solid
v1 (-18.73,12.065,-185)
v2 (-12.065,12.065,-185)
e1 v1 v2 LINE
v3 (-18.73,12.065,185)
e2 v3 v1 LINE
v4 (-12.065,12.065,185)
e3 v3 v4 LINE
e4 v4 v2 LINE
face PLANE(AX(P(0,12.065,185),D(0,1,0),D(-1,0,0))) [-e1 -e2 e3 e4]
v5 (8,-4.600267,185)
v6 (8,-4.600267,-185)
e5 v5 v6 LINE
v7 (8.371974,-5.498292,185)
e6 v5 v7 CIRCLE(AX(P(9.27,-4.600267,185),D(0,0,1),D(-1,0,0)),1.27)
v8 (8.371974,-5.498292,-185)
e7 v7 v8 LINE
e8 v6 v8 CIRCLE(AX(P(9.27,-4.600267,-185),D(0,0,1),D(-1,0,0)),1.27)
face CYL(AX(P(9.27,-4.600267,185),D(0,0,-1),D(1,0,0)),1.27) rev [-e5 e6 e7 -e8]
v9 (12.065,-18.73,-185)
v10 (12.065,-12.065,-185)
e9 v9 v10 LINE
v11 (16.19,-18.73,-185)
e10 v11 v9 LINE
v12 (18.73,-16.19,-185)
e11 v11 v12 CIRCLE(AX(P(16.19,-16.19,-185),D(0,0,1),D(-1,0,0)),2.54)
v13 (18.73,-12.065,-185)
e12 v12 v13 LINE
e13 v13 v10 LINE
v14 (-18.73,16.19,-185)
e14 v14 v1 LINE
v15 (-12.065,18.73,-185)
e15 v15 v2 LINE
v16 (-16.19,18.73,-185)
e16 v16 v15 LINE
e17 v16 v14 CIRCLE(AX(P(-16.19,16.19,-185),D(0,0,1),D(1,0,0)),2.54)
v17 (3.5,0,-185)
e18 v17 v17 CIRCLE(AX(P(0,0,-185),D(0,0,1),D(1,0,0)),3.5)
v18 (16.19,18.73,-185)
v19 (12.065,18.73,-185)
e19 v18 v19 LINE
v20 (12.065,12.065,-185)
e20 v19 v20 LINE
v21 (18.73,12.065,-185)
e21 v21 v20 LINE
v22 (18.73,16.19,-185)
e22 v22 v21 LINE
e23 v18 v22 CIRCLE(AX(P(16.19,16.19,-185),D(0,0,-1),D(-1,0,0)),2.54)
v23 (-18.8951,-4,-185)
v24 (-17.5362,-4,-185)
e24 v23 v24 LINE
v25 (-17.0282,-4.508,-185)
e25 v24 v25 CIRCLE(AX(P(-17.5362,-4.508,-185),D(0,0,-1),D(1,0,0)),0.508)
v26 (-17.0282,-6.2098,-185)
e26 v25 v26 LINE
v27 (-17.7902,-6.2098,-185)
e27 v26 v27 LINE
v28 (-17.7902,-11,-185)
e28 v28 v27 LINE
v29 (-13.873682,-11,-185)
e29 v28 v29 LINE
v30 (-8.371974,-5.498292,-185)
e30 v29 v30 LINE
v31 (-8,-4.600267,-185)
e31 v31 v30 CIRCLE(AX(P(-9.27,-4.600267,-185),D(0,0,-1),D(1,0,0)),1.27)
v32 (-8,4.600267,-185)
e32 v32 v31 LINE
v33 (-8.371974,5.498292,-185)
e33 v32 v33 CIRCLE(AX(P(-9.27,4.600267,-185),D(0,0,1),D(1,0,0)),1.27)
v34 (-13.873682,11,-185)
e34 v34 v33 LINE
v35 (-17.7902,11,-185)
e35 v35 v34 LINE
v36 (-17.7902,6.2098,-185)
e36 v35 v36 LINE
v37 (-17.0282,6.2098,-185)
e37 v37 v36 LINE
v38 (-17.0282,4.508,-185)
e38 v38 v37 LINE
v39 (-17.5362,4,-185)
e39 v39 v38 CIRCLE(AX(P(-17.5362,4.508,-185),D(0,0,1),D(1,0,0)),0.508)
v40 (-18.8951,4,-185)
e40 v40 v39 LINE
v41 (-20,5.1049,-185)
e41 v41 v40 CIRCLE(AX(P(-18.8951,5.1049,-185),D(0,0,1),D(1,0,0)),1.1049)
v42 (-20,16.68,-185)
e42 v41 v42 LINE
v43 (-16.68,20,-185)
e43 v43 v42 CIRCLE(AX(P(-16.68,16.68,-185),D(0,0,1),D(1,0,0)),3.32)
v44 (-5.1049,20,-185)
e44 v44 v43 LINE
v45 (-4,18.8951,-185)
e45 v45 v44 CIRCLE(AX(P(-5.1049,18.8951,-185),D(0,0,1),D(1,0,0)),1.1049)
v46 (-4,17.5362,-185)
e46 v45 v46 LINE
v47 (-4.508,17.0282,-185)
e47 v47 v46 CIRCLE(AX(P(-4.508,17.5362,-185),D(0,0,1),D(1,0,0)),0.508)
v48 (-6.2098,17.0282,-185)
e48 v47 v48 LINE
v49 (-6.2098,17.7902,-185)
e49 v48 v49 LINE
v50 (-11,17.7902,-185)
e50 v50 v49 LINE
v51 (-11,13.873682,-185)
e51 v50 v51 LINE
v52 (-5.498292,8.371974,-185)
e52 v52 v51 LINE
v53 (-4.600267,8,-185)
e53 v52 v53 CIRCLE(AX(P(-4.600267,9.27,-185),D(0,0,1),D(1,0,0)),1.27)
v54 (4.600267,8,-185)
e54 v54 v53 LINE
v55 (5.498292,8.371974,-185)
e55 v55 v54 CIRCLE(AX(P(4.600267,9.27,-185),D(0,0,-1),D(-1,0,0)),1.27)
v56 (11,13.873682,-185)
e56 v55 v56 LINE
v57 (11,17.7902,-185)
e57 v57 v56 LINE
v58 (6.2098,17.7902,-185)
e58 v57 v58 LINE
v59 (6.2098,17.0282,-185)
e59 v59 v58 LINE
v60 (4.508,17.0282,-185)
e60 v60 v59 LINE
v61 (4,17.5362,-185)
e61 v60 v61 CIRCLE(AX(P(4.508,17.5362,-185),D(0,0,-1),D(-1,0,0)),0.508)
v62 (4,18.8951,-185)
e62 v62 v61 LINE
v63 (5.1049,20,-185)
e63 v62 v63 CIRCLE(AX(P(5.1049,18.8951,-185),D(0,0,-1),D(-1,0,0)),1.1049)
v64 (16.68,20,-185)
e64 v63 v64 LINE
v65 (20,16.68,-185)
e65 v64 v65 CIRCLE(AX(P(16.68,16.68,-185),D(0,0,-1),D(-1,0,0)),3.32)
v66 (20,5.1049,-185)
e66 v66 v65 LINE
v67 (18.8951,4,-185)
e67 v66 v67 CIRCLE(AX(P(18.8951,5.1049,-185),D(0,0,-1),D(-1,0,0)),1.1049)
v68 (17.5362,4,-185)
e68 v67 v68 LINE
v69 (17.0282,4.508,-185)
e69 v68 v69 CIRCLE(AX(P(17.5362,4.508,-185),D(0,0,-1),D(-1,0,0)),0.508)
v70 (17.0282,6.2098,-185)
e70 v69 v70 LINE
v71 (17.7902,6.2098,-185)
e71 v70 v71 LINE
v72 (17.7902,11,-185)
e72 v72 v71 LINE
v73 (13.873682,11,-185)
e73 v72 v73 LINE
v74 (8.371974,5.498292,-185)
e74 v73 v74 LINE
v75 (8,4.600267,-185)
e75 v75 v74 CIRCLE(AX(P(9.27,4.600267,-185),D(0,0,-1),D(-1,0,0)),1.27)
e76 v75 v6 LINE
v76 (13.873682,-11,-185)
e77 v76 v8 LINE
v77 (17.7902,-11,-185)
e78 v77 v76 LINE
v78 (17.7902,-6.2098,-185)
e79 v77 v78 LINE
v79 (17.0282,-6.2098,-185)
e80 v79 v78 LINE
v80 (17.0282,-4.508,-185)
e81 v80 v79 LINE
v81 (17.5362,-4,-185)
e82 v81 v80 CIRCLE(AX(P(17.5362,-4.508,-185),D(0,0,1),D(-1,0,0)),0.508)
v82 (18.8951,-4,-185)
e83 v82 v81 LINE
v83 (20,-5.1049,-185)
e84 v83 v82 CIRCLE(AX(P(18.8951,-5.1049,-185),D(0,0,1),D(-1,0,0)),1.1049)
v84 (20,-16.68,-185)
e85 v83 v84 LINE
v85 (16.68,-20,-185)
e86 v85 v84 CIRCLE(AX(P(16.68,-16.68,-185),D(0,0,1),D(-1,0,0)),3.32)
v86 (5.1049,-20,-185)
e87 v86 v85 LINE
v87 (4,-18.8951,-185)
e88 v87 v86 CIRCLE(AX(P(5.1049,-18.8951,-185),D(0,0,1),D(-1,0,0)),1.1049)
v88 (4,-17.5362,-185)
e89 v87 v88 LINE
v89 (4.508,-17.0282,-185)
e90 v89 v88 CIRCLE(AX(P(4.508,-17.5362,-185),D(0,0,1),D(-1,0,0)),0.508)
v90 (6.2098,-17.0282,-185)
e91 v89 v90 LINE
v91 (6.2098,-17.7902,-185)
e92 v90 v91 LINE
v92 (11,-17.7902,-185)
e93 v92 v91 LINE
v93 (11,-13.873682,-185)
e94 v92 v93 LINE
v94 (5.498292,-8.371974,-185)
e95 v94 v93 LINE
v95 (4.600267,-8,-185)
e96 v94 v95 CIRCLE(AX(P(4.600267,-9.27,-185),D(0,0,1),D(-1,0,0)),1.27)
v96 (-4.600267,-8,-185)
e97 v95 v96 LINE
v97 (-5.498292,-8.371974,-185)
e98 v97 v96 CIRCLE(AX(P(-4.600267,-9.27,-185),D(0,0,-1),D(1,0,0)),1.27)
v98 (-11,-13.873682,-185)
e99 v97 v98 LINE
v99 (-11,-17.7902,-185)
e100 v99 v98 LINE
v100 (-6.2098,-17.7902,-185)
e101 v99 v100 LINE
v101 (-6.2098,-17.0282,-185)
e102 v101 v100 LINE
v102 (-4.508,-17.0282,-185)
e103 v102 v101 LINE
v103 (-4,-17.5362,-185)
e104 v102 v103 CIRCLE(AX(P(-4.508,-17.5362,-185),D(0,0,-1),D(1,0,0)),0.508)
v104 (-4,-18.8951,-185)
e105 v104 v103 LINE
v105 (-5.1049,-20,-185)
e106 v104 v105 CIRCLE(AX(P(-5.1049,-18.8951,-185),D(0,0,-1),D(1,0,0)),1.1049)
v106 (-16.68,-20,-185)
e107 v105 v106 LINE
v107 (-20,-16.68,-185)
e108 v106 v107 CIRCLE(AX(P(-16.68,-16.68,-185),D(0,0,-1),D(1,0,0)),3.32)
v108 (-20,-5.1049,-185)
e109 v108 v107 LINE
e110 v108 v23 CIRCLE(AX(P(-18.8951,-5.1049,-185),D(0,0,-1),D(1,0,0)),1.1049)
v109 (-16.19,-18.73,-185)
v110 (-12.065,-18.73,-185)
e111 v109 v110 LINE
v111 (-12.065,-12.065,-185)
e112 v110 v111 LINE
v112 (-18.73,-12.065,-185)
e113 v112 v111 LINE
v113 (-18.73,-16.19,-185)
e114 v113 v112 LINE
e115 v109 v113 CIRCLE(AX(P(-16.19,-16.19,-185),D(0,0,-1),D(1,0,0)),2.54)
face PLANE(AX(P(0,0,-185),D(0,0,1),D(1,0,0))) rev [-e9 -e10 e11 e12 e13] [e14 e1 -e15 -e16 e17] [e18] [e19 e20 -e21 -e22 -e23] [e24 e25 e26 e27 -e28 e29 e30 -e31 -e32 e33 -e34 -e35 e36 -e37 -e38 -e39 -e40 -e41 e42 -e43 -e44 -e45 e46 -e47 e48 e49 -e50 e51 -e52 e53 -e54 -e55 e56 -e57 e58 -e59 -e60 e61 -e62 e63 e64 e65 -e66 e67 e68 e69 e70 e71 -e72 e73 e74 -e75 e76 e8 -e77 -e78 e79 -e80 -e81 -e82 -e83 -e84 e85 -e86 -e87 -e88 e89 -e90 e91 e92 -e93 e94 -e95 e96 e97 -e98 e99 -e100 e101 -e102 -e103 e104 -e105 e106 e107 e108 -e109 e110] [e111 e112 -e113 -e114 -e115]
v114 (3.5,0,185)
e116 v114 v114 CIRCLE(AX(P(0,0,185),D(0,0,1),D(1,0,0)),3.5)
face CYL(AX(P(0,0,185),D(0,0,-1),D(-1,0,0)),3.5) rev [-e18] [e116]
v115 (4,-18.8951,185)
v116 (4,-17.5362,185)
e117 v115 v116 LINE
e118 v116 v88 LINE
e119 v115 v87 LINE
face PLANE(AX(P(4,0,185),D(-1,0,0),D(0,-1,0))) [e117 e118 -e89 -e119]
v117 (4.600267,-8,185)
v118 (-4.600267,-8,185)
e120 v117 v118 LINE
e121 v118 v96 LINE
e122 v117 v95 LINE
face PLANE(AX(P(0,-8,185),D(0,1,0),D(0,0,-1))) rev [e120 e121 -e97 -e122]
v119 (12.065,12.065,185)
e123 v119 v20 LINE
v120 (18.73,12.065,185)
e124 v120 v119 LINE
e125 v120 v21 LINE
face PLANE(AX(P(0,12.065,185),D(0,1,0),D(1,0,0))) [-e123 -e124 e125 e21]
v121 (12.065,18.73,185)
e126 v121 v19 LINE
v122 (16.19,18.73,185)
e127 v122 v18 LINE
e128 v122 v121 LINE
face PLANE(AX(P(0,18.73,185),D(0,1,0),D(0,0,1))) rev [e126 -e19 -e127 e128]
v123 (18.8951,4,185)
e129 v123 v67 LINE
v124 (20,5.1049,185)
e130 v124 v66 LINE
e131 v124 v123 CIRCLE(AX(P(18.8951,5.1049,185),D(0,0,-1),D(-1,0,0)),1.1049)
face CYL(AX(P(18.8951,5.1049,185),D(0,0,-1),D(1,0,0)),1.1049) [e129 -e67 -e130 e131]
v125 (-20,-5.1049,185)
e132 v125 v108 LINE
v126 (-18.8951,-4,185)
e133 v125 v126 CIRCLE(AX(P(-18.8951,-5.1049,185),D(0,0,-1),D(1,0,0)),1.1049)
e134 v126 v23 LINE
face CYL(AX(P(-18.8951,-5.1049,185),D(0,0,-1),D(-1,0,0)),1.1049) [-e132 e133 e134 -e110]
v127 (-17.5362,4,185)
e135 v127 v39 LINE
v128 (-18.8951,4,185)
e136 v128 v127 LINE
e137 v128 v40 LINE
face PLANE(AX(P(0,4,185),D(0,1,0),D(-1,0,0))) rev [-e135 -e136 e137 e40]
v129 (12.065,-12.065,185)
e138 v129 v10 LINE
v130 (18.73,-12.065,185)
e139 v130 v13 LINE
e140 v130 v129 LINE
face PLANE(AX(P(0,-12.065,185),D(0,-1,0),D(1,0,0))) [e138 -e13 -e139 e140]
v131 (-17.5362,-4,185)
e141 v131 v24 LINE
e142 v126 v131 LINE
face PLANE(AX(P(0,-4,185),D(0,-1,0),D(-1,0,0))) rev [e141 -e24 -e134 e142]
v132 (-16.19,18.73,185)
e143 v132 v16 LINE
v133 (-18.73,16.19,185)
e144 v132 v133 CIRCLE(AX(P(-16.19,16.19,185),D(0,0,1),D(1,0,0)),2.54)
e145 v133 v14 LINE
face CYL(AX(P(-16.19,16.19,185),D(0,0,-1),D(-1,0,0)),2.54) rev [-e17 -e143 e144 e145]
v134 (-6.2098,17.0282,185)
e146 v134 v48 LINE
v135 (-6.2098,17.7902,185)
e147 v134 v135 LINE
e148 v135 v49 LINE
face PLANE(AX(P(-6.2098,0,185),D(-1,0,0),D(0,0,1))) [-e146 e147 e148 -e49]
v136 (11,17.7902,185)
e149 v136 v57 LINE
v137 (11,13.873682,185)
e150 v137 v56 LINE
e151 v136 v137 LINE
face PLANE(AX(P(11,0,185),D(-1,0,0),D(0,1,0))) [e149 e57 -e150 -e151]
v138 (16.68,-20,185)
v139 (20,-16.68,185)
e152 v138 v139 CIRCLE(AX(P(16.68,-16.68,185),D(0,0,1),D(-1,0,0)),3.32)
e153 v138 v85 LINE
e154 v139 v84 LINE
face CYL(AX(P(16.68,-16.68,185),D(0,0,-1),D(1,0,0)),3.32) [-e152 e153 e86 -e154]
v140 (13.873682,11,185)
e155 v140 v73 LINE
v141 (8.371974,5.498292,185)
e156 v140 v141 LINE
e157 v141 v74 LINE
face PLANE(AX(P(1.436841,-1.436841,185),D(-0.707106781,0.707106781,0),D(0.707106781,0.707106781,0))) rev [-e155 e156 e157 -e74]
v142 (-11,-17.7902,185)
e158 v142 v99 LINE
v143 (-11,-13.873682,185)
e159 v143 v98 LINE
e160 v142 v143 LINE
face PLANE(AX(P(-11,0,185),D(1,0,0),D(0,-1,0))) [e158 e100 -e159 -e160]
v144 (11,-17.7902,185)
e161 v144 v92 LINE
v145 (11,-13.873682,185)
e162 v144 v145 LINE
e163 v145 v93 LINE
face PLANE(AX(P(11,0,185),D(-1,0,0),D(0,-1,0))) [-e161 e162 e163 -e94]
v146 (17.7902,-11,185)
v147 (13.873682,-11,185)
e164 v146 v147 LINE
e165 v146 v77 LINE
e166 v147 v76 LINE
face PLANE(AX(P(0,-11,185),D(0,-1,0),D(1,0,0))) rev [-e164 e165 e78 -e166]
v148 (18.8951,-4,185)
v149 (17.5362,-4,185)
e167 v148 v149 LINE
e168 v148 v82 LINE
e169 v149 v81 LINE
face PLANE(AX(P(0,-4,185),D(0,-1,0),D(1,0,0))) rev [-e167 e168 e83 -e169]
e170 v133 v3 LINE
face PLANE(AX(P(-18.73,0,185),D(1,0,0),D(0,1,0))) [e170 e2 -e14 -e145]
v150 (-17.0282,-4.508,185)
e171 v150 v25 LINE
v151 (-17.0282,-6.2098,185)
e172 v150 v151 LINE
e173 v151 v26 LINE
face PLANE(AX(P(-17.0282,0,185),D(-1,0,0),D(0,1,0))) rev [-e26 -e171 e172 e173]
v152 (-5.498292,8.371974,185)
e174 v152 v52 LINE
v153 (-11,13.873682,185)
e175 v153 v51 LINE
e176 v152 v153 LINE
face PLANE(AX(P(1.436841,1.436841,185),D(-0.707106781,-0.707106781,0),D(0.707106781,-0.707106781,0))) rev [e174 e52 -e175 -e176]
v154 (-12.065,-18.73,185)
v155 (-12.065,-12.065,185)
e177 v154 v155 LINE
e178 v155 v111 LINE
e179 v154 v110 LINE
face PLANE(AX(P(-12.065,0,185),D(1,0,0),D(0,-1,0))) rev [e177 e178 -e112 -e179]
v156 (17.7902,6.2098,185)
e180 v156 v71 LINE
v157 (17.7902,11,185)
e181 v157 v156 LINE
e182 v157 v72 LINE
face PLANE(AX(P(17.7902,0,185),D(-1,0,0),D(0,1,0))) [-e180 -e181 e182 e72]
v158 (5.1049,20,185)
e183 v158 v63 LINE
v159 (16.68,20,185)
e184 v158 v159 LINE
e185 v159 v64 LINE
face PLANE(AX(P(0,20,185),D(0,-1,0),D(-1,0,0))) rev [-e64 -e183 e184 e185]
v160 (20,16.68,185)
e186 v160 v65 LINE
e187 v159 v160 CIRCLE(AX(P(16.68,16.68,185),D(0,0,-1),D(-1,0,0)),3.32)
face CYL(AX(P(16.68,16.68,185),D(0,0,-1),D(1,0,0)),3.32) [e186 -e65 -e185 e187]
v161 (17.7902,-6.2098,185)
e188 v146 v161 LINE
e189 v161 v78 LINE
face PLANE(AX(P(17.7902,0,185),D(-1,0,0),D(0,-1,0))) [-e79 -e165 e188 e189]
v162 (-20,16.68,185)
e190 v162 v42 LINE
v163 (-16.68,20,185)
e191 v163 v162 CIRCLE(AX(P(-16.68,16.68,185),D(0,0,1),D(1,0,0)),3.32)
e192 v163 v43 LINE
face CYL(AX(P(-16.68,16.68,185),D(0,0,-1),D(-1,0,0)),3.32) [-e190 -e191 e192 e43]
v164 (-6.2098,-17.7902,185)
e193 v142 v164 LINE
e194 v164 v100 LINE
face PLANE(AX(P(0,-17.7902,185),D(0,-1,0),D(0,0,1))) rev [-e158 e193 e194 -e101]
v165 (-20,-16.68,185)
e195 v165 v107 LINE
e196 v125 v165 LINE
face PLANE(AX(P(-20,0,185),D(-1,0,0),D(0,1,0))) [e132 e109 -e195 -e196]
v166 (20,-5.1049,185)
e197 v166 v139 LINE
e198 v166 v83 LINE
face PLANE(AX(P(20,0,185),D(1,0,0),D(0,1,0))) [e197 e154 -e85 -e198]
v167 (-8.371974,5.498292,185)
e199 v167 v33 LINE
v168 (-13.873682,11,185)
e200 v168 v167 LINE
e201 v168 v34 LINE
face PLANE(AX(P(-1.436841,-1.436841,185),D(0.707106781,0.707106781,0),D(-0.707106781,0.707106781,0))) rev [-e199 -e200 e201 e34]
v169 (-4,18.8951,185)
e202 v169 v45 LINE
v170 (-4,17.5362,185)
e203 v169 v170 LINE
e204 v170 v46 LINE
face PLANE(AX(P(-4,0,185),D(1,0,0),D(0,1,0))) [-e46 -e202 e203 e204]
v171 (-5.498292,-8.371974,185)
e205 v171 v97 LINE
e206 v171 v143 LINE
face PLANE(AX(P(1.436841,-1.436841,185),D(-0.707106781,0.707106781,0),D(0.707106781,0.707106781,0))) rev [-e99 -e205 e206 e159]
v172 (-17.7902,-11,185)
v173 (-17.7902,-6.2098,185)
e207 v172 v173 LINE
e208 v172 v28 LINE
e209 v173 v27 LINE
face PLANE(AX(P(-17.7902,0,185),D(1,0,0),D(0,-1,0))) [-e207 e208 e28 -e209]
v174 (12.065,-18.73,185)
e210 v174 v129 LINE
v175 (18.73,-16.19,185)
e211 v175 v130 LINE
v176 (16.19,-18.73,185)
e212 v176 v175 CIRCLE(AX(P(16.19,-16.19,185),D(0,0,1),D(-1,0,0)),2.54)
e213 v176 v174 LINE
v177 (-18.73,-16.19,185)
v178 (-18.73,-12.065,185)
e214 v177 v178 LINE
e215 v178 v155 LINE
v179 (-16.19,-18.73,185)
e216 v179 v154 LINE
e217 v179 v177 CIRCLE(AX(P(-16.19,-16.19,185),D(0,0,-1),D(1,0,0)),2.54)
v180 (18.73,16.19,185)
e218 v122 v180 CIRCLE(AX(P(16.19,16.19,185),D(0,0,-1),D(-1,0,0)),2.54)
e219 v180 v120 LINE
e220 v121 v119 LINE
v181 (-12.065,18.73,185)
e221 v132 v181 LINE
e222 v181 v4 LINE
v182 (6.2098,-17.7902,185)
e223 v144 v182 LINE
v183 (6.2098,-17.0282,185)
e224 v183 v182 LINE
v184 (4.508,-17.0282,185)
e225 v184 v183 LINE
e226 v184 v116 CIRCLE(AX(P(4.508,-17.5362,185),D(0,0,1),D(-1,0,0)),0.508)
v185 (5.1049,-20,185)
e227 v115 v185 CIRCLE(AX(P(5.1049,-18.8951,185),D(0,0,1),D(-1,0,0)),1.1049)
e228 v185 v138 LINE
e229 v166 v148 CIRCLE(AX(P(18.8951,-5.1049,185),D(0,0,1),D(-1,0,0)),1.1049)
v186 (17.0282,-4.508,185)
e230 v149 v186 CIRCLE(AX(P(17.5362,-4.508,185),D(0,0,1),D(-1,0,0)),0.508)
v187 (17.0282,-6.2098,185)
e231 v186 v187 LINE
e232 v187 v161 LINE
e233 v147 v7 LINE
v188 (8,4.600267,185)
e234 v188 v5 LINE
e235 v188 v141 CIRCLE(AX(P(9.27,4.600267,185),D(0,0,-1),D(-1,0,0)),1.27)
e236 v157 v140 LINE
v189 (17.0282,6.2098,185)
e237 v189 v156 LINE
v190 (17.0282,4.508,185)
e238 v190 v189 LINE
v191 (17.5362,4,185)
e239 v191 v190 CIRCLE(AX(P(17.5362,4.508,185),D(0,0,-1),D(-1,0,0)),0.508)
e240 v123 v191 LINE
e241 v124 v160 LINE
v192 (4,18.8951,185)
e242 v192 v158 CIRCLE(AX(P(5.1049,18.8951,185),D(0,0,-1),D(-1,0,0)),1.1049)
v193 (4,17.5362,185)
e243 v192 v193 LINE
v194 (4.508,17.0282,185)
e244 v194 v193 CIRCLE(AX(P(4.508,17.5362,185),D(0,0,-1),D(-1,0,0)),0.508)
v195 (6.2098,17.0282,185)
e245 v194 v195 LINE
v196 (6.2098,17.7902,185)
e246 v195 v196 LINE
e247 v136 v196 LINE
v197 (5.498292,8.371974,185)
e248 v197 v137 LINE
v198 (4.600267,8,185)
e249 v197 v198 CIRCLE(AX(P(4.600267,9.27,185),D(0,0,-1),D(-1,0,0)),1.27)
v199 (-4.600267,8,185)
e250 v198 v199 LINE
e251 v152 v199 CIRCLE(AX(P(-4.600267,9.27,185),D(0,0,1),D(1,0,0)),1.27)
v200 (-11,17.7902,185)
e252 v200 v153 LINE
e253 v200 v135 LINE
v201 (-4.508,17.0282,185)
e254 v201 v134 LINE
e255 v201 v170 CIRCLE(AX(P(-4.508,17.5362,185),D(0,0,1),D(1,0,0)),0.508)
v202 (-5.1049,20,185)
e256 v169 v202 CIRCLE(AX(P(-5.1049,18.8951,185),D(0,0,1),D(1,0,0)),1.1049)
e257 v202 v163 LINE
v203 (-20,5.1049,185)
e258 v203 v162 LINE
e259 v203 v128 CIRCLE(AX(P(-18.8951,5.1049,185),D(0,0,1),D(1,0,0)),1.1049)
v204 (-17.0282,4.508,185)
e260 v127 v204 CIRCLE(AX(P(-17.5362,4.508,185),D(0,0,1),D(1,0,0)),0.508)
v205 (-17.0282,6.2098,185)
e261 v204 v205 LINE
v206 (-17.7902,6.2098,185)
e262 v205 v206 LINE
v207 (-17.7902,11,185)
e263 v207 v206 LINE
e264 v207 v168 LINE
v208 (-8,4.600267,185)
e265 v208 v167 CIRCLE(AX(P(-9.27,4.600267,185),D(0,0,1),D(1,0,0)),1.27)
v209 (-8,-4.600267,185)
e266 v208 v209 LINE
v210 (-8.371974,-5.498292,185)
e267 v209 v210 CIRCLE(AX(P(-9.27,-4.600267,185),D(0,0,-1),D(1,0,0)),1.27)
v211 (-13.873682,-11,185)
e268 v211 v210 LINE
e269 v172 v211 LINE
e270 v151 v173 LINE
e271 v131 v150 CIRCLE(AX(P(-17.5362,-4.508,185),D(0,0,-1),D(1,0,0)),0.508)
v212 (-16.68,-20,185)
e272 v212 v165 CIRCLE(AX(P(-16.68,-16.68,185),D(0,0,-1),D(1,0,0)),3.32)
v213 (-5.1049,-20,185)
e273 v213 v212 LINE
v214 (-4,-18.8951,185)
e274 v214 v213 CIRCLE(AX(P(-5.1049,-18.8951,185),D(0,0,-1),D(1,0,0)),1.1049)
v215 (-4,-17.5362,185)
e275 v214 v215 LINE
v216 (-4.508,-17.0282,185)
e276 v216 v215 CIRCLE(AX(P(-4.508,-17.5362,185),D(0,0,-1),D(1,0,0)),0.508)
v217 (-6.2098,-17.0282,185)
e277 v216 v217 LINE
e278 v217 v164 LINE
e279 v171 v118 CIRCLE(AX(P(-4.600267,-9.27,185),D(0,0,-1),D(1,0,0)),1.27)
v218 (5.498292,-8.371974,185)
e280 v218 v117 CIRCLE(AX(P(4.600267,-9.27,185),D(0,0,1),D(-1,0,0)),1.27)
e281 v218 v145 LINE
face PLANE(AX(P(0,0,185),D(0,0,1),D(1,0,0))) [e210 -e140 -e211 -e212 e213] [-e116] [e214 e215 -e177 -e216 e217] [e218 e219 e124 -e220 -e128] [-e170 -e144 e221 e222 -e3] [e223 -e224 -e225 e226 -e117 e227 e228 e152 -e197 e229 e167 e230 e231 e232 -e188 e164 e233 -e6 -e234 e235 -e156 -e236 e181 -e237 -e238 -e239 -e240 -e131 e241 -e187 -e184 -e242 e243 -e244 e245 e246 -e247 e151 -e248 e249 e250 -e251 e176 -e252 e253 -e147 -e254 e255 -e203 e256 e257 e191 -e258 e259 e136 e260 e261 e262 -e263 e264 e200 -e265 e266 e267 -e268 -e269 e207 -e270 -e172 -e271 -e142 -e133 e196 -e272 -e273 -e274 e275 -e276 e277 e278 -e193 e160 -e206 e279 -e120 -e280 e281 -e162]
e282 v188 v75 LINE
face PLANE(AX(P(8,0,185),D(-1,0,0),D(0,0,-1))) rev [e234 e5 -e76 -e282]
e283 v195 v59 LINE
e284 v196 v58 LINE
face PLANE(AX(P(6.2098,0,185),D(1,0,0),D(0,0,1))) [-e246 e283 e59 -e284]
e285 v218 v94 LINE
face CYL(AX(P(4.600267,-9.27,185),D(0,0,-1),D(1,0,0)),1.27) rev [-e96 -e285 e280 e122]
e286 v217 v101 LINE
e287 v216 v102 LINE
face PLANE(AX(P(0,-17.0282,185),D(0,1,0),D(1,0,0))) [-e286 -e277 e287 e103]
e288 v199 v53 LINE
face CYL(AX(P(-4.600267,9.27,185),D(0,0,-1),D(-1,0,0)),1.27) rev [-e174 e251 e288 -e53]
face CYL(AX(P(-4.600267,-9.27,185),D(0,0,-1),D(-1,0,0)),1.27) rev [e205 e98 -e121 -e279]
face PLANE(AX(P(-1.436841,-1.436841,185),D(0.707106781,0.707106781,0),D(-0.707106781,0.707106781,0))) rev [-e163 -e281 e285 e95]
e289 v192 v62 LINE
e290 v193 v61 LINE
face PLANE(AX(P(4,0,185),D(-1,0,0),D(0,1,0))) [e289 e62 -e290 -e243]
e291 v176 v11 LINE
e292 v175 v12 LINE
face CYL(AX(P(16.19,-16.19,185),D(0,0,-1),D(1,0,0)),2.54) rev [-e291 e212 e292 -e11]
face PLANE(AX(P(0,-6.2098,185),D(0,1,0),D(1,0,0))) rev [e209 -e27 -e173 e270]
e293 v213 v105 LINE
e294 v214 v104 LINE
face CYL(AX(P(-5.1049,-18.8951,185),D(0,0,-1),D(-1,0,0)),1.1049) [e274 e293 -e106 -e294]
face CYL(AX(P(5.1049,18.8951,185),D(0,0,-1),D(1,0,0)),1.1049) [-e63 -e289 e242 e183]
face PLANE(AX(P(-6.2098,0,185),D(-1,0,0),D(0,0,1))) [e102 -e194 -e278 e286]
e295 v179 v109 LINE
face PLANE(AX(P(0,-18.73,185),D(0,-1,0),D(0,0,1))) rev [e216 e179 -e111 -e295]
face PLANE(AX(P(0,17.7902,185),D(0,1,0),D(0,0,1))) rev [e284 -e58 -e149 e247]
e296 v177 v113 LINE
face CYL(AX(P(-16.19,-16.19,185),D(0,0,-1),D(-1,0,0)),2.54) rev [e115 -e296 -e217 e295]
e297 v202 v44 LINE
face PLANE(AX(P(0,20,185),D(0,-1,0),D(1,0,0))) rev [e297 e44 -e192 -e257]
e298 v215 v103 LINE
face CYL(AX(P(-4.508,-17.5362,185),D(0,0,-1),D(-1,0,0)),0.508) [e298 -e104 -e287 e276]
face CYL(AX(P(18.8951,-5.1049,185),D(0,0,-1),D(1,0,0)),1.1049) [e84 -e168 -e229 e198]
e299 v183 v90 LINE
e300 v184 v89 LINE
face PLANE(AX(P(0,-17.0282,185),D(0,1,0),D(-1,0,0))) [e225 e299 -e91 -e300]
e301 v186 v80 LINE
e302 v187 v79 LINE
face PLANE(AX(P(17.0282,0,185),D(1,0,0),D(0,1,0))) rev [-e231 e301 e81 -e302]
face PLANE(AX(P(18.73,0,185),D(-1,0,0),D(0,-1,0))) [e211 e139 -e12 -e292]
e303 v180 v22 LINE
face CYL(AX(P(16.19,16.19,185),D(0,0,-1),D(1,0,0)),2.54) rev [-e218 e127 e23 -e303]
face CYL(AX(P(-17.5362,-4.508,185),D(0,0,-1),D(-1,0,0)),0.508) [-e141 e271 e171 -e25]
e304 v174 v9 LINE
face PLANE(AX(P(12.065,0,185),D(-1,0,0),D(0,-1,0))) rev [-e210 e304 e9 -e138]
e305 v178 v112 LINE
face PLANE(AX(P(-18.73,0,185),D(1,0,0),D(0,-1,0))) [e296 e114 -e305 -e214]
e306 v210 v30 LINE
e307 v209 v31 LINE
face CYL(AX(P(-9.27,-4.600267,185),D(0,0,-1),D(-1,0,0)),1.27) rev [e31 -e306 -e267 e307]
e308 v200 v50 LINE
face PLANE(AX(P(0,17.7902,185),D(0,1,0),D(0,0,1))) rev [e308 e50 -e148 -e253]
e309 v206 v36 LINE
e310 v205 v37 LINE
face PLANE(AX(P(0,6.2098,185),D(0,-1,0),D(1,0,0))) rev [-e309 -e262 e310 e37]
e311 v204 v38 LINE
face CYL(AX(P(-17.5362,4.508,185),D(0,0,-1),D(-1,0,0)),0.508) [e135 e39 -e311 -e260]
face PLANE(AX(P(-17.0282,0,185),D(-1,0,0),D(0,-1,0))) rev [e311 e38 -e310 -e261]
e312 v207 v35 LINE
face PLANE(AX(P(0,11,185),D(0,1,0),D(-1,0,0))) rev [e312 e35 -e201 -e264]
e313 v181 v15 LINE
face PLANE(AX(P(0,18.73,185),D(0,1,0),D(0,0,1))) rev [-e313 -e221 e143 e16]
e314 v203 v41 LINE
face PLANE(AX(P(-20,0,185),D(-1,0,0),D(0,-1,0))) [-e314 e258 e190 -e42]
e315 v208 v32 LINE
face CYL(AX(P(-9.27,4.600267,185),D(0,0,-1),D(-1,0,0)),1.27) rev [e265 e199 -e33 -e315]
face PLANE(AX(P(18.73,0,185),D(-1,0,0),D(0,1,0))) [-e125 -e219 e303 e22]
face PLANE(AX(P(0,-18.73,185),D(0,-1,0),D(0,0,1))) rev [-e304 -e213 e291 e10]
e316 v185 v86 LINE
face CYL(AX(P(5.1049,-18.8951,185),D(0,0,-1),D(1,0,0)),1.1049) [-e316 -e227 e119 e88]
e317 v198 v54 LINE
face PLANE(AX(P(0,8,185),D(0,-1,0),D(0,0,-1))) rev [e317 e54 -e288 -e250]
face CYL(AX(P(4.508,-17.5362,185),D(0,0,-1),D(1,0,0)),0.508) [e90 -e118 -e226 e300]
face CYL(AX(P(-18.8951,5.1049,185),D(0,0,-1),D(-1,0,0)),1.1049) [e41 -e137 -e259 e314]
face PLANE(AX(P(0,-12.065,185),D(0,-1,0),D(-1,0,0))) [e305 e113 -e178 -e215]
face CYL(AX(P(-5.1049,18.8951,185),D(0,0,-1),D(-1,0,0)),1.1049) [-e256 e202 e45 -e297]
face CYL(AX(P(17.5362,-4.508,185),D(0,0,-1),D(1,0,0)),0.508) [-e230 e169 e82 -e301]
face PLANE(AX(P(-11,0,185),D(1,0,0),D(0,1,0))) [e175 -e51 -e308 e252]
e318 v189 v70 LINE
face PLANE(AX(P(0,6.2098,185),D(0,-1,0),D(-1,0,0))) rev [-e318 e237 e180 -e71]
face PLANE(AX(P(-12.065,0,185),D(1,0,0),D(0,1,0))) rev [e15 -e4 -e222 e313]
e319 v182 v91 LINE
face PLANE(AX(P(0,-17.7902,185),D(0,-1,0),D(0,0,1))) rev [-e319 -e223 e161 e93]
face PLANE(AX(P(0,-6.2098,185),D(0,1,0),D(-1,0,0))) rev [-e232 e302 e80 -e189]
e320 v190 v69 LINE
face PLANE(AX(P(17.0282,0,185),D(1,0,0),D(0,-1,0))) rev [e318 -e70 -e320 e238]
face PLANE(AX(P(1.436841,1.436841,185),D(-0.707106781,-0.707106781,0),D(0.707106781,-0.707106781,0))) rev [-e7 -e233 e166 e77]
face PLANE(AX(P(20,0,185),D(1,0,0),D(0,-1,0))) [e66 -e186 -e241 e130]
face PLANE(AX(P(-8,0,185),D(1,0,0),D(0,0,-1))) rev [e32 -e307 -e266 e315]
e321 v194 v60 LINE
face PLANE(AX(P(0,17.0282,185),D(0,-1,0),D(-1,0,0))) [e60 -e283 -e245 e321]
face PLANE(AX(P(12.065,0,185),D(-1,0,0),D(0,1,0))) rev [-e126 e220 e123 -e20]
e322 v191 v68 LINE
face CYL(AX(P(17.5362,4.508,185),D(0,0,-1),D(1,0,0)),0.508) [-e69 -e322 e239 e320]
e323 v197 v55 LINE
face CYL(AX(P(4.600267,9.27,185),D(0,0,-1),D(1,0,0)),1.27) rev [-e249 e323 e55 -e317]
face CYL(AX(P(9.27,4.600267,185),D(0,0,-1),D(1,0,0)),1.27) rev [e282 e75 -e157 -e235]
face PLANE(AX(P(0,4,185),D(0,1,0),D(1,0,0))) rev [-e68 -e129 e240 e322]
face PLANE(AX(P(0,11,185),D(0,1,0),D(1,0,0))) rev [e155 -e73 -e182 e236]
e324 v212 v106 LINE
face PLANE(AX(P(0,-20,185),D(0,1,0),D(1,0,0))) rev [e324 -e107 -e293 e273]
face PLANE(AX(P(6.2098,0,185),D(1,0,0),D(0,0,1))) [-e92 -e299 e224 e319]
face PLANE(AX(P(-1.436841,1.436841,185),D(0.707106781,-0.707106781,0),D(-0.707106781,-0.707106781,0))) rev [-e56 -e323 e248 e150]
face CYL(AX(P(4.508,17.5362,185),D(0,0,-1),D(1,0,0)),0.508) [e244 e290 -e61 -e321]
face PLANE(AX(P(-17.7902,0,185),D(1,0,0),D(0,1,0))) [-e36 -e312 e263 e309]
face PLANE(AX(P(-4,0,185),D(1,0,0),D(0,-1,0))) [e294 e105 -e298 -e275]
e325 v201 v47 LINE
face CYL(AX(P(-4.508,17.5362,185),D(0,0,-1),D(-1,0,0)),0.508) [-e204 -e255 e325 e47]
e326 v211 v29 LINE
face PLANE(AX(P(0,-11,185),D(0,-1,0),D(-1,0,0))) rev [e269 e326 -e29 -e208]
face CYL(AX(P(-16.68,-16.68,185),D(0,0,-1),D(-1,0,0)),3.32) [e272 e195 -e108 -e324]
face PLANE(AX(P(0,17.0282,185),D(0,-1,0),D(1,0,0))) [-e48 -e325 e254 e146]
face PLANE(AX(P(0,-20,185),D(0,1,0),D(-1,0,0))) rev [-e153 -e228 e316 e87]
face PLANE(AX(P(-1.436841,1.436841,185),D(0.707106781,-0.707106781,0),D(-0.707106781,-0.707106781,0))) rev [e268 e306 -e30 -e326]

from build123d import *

# Parameters (mm, degrees)
BOSS_EXTRUDE1_DEPTH = 185
MIRROR3_START       = -185
MIRROR3_DEPTH       = 370


# Read off the part's stored shape, not the designer's step: Mirror3
with BuildPart() as part:
    # Sketch3 → Boss-Extrude1 (new, symmetric)
    with BuildSketch(Plane.XY):
        with BuildLine():
            Line((0, 8), (0, 3.5))
            ThreePointArc((0, 3.5), (-2.474873734, 2.474873734), (-3.5, 0))
            Line((-3.5, 0), (-8, 0))
            Line((-8, 0), (-8, 4.600266817))
            ThreePointArc((-8, 4.600266817), (-8.096672994, 5.086274776), (-8.371974388, 5.498292429))
            Line((-8.371974388, 5.498292429), (-13.873681959, 11))
            Line((-13.873681959, 11), (-17.7902, 11))
            Line((-17.7902, 11), (-17.7902, 6.2098))
            Line((-17.7902, 6.2098), (-17.0282, 6.2098))
            Line((-17.0282, 6.2098), (-17.0282, 4.508))
            ThreePointArc((-17.0282, 4.508), (-17.176989755, 4.148789755), (-17.5362, 4))
            Line((-17.5362, 4), (-18.8951, 4))
            ThreePointArc((-18.8951, 4), (-19.676382283, 4.323617717), (-20, 5.1049))
            Line((-20, 5.1049), (-20, 16.68))
            ThreePointArc((-20, 16.68), (-19.027594514, 19.027594514), (-16.68, 20))
            Line((-16.68, 20), (-5.1049, 20))
            ThreePointArc((-5.1049, 20), (-4.323617717, 19.676382283), (-4, 18.8951))
            Line((-4, 18.8951), (-4, 17.5362))
            ThreePointArc((-4, 17.5362), (-4.148789755, 17.176989755), (-4.508, 17.0282))
            Line((-4.508, 17.0282), (-6.2098, 17.0282))
            Line((-6.2098, 17.0282), (-6.2098, 17.7902))
            Line((-6.2098, 17.7902), (-11, 17.7902))
            Line((-11, 17.7902), (-11, 13.873681959))
            Line((-11, 13.873681959), (-5.498292429, 8.371974388))
            ThreePointArc((-5.498292429, 8.371974388), (-5.086274776, 8.096672994), (-4.600266817, 8))
            Line((-4.600266817, 8), (0, 8))
        make_face()
        with BuildLine():
            Line((-12.065, 18.73), (-12.065, 12.065))
            Line((-12.065, 12.065), (-18.73, 12.065))
            Line((-18.73, 12.065), (-18.73, 16.19))
            ThreePointArc((-18.73, 16.19), (-17.986051224, 17.986051224), (-16.19, 18.73))
            Line((-16.19, 18.73), (-12.065, 18.73))
        make_face(mode=Mode.SUBTRACT)
    extrude(amount=BOSS_EXTRUDE1_DEPTH, both=True)

    # Mirror1: part across plane


with BuildPart() as part_1:
    add(part.part)
    add(part.part.mirror(Plane(origin=(0, 0, 185), x_dir=(0, 0, 1), z_dir=(1, 0, 0))))

    # Mirror3 outline → Mirror3 (add)
    with BuildSketch(Plane.XY.offset(MIRROR3_START)):
        with BuildLine():
            Line((-8, 0), (-8, -4.600266817))
            ThreePointArc((-8, -4.600266817), (-8.096672994, -5.086274776), (-8.371974388, -5.498292429))
            Line((-8.371974388, -5.498292429), (-13.873681959, -11))
            Line((-13.873681959, -11), (-17.7902, -11))
            Line((-17.7902, -11), (-17.7902, -6.2098))
            Line((-17.7902, -6.2098), (-17.0282, -6.2098))
            Line((-17.0282, -6.2098), (-17.0282, -4.508))
            ThreePointArc((-17.0282, -4.508), (-17.176989755, -4.148789755), (-17.5362, -4))
            Line((-17.5362, -4), (-18.8951, -4))
            ThreePointArc((-18.8951, -4), (-19.676382283, -4.323617717), (-20, -5.1049))
            Line((-20, -5.1049), (-20, -16.68))
            ThreePointArc((-20, -16.68), (-19.027594514, -19.027594514), (-16.68, -20))
            Line((-16.68, -20), (-5.1049, -20))
            ThreePointArc((-5.1049, -20), (-4.323617717, -19.676382283), (-4, -18.8951))
            Line((-4, -18.8951), (-4, -17.5362))
            ThreePointArc((-4, -17.5362), (-4.148789755, -17.176989755), (-4.508, -17.0282))
            Line((-4.508, -17.0282), (-6.2098, -17.0282))
            Line((-6.2098, -17.0282), (-6.2098, -17.7902))
            Line((-6.2098, -17.7902), (-11, -17.7902))
            Line((-11, -17.7902), (-11, -13.873681959))
            Line((-11, -13.873681959), (-5.498292429, -8.371974388))
            ThreePointArc((-5.498292429, -8.371974388), (-5.086274776, -8.096672994), (-4.600266817, -8))
            Line((-4.600266817, -8), (4.600266817, -8))
            ThreePointArc((4.600266817, -8), (5.086274776, -8.096672994), (5.498292429, -8.371974388))
            Line((5.498292429, -8.371974388), (11, -13.873681959))
            Line((11, -13.873681959), (11, -17.7902))
            Line((11, -17.7902), (6.2098, -17.7902))
            Line((6.2098, -17.7902), (6.2098, -17.0282))
            Line((6.2098, -17.0282), (4.508, -17.0282))
            ThreePointArc((4.508, -17.0282), (4.148789755, -17.176989755), (4, -17.5362))
            Line((4, -17.5362), (4, -18.8951))
            ThreePointArc((4, -18.8951), (4.323617717, -19.676382283), (5.1049, -20))
            Line((5.1049, -20), (16.68, -20))
            ThreePointArc((16.68, -20), (19.027594514, -19.027594514), (20, -16.68))
            Line((20, -16.68), (20, -5.1049))
            ThreePointArc((20, -5.1049), (19.676382283, -4.323617717), (18.8951, -4))
            Line((18.8951, -4), (17.5362, -4))
            ThreePointArc((17.5362, -4), (17.176989755, -4.148789755), (17.0282, -4.508))
            Line((17.0282, -4.508), (17.0282, -6.2098))
            Line((17.0282, -6.2098), (17.7902, -6.2098))
            Line((17.7902, -6.2098), (17.7902, -11))
            Line((17.7902, -11), (13.873681959, -11))
            Line((13.873681959, -11), (8.371974388, -5.498292429))
            ThreePointArc((8.371974388, -5.498292429), (8.096672994, -5.086274776), (8, -4.600266817))
            Line((8, -4.600266817), (8, 0))
            Line((8, 0), (3.5, 0))
            ThreePointArc((3.5, 0), (0, -3.5), (-3.5, 0))
            Line((-3.5, 0), (-8, 0))
        make_face()
        with BuildLine():
            Line((-12.065, -12.065), (-12.065, -18.73))
            Line((-12.065, -18.73), (-16.19, -18.73))
            ThreePointArc((-16.19, -18.73), (-17.986051224, -17.986051224), (-18.73, -16.19))
            Line((-18.73, -16.19), (-18.73, -12.065))
            Line((-18.73, -12.065), (-12.065, -12.065))
        make_face(mode=Mode.SUBTRACT)
        with BuildLine():
            Line((12.065, -18.73), (12.065, -12.065))
            Line((12.065, -12.065), (18.73, -12.065))
            Line((18.73, -12.065), (18.73, -16.19))
            ThreePointArc((18.73, -16.19), (17.986051224, -17.986051224), (16.19, -18.73))
            Line((16.19, -18.73), (12.065, -18.73))
        make_face(mode=Mode.SUBTRACT)
    extrude(amount=MIRROR3_DEPTH)


solid = part_1.part
